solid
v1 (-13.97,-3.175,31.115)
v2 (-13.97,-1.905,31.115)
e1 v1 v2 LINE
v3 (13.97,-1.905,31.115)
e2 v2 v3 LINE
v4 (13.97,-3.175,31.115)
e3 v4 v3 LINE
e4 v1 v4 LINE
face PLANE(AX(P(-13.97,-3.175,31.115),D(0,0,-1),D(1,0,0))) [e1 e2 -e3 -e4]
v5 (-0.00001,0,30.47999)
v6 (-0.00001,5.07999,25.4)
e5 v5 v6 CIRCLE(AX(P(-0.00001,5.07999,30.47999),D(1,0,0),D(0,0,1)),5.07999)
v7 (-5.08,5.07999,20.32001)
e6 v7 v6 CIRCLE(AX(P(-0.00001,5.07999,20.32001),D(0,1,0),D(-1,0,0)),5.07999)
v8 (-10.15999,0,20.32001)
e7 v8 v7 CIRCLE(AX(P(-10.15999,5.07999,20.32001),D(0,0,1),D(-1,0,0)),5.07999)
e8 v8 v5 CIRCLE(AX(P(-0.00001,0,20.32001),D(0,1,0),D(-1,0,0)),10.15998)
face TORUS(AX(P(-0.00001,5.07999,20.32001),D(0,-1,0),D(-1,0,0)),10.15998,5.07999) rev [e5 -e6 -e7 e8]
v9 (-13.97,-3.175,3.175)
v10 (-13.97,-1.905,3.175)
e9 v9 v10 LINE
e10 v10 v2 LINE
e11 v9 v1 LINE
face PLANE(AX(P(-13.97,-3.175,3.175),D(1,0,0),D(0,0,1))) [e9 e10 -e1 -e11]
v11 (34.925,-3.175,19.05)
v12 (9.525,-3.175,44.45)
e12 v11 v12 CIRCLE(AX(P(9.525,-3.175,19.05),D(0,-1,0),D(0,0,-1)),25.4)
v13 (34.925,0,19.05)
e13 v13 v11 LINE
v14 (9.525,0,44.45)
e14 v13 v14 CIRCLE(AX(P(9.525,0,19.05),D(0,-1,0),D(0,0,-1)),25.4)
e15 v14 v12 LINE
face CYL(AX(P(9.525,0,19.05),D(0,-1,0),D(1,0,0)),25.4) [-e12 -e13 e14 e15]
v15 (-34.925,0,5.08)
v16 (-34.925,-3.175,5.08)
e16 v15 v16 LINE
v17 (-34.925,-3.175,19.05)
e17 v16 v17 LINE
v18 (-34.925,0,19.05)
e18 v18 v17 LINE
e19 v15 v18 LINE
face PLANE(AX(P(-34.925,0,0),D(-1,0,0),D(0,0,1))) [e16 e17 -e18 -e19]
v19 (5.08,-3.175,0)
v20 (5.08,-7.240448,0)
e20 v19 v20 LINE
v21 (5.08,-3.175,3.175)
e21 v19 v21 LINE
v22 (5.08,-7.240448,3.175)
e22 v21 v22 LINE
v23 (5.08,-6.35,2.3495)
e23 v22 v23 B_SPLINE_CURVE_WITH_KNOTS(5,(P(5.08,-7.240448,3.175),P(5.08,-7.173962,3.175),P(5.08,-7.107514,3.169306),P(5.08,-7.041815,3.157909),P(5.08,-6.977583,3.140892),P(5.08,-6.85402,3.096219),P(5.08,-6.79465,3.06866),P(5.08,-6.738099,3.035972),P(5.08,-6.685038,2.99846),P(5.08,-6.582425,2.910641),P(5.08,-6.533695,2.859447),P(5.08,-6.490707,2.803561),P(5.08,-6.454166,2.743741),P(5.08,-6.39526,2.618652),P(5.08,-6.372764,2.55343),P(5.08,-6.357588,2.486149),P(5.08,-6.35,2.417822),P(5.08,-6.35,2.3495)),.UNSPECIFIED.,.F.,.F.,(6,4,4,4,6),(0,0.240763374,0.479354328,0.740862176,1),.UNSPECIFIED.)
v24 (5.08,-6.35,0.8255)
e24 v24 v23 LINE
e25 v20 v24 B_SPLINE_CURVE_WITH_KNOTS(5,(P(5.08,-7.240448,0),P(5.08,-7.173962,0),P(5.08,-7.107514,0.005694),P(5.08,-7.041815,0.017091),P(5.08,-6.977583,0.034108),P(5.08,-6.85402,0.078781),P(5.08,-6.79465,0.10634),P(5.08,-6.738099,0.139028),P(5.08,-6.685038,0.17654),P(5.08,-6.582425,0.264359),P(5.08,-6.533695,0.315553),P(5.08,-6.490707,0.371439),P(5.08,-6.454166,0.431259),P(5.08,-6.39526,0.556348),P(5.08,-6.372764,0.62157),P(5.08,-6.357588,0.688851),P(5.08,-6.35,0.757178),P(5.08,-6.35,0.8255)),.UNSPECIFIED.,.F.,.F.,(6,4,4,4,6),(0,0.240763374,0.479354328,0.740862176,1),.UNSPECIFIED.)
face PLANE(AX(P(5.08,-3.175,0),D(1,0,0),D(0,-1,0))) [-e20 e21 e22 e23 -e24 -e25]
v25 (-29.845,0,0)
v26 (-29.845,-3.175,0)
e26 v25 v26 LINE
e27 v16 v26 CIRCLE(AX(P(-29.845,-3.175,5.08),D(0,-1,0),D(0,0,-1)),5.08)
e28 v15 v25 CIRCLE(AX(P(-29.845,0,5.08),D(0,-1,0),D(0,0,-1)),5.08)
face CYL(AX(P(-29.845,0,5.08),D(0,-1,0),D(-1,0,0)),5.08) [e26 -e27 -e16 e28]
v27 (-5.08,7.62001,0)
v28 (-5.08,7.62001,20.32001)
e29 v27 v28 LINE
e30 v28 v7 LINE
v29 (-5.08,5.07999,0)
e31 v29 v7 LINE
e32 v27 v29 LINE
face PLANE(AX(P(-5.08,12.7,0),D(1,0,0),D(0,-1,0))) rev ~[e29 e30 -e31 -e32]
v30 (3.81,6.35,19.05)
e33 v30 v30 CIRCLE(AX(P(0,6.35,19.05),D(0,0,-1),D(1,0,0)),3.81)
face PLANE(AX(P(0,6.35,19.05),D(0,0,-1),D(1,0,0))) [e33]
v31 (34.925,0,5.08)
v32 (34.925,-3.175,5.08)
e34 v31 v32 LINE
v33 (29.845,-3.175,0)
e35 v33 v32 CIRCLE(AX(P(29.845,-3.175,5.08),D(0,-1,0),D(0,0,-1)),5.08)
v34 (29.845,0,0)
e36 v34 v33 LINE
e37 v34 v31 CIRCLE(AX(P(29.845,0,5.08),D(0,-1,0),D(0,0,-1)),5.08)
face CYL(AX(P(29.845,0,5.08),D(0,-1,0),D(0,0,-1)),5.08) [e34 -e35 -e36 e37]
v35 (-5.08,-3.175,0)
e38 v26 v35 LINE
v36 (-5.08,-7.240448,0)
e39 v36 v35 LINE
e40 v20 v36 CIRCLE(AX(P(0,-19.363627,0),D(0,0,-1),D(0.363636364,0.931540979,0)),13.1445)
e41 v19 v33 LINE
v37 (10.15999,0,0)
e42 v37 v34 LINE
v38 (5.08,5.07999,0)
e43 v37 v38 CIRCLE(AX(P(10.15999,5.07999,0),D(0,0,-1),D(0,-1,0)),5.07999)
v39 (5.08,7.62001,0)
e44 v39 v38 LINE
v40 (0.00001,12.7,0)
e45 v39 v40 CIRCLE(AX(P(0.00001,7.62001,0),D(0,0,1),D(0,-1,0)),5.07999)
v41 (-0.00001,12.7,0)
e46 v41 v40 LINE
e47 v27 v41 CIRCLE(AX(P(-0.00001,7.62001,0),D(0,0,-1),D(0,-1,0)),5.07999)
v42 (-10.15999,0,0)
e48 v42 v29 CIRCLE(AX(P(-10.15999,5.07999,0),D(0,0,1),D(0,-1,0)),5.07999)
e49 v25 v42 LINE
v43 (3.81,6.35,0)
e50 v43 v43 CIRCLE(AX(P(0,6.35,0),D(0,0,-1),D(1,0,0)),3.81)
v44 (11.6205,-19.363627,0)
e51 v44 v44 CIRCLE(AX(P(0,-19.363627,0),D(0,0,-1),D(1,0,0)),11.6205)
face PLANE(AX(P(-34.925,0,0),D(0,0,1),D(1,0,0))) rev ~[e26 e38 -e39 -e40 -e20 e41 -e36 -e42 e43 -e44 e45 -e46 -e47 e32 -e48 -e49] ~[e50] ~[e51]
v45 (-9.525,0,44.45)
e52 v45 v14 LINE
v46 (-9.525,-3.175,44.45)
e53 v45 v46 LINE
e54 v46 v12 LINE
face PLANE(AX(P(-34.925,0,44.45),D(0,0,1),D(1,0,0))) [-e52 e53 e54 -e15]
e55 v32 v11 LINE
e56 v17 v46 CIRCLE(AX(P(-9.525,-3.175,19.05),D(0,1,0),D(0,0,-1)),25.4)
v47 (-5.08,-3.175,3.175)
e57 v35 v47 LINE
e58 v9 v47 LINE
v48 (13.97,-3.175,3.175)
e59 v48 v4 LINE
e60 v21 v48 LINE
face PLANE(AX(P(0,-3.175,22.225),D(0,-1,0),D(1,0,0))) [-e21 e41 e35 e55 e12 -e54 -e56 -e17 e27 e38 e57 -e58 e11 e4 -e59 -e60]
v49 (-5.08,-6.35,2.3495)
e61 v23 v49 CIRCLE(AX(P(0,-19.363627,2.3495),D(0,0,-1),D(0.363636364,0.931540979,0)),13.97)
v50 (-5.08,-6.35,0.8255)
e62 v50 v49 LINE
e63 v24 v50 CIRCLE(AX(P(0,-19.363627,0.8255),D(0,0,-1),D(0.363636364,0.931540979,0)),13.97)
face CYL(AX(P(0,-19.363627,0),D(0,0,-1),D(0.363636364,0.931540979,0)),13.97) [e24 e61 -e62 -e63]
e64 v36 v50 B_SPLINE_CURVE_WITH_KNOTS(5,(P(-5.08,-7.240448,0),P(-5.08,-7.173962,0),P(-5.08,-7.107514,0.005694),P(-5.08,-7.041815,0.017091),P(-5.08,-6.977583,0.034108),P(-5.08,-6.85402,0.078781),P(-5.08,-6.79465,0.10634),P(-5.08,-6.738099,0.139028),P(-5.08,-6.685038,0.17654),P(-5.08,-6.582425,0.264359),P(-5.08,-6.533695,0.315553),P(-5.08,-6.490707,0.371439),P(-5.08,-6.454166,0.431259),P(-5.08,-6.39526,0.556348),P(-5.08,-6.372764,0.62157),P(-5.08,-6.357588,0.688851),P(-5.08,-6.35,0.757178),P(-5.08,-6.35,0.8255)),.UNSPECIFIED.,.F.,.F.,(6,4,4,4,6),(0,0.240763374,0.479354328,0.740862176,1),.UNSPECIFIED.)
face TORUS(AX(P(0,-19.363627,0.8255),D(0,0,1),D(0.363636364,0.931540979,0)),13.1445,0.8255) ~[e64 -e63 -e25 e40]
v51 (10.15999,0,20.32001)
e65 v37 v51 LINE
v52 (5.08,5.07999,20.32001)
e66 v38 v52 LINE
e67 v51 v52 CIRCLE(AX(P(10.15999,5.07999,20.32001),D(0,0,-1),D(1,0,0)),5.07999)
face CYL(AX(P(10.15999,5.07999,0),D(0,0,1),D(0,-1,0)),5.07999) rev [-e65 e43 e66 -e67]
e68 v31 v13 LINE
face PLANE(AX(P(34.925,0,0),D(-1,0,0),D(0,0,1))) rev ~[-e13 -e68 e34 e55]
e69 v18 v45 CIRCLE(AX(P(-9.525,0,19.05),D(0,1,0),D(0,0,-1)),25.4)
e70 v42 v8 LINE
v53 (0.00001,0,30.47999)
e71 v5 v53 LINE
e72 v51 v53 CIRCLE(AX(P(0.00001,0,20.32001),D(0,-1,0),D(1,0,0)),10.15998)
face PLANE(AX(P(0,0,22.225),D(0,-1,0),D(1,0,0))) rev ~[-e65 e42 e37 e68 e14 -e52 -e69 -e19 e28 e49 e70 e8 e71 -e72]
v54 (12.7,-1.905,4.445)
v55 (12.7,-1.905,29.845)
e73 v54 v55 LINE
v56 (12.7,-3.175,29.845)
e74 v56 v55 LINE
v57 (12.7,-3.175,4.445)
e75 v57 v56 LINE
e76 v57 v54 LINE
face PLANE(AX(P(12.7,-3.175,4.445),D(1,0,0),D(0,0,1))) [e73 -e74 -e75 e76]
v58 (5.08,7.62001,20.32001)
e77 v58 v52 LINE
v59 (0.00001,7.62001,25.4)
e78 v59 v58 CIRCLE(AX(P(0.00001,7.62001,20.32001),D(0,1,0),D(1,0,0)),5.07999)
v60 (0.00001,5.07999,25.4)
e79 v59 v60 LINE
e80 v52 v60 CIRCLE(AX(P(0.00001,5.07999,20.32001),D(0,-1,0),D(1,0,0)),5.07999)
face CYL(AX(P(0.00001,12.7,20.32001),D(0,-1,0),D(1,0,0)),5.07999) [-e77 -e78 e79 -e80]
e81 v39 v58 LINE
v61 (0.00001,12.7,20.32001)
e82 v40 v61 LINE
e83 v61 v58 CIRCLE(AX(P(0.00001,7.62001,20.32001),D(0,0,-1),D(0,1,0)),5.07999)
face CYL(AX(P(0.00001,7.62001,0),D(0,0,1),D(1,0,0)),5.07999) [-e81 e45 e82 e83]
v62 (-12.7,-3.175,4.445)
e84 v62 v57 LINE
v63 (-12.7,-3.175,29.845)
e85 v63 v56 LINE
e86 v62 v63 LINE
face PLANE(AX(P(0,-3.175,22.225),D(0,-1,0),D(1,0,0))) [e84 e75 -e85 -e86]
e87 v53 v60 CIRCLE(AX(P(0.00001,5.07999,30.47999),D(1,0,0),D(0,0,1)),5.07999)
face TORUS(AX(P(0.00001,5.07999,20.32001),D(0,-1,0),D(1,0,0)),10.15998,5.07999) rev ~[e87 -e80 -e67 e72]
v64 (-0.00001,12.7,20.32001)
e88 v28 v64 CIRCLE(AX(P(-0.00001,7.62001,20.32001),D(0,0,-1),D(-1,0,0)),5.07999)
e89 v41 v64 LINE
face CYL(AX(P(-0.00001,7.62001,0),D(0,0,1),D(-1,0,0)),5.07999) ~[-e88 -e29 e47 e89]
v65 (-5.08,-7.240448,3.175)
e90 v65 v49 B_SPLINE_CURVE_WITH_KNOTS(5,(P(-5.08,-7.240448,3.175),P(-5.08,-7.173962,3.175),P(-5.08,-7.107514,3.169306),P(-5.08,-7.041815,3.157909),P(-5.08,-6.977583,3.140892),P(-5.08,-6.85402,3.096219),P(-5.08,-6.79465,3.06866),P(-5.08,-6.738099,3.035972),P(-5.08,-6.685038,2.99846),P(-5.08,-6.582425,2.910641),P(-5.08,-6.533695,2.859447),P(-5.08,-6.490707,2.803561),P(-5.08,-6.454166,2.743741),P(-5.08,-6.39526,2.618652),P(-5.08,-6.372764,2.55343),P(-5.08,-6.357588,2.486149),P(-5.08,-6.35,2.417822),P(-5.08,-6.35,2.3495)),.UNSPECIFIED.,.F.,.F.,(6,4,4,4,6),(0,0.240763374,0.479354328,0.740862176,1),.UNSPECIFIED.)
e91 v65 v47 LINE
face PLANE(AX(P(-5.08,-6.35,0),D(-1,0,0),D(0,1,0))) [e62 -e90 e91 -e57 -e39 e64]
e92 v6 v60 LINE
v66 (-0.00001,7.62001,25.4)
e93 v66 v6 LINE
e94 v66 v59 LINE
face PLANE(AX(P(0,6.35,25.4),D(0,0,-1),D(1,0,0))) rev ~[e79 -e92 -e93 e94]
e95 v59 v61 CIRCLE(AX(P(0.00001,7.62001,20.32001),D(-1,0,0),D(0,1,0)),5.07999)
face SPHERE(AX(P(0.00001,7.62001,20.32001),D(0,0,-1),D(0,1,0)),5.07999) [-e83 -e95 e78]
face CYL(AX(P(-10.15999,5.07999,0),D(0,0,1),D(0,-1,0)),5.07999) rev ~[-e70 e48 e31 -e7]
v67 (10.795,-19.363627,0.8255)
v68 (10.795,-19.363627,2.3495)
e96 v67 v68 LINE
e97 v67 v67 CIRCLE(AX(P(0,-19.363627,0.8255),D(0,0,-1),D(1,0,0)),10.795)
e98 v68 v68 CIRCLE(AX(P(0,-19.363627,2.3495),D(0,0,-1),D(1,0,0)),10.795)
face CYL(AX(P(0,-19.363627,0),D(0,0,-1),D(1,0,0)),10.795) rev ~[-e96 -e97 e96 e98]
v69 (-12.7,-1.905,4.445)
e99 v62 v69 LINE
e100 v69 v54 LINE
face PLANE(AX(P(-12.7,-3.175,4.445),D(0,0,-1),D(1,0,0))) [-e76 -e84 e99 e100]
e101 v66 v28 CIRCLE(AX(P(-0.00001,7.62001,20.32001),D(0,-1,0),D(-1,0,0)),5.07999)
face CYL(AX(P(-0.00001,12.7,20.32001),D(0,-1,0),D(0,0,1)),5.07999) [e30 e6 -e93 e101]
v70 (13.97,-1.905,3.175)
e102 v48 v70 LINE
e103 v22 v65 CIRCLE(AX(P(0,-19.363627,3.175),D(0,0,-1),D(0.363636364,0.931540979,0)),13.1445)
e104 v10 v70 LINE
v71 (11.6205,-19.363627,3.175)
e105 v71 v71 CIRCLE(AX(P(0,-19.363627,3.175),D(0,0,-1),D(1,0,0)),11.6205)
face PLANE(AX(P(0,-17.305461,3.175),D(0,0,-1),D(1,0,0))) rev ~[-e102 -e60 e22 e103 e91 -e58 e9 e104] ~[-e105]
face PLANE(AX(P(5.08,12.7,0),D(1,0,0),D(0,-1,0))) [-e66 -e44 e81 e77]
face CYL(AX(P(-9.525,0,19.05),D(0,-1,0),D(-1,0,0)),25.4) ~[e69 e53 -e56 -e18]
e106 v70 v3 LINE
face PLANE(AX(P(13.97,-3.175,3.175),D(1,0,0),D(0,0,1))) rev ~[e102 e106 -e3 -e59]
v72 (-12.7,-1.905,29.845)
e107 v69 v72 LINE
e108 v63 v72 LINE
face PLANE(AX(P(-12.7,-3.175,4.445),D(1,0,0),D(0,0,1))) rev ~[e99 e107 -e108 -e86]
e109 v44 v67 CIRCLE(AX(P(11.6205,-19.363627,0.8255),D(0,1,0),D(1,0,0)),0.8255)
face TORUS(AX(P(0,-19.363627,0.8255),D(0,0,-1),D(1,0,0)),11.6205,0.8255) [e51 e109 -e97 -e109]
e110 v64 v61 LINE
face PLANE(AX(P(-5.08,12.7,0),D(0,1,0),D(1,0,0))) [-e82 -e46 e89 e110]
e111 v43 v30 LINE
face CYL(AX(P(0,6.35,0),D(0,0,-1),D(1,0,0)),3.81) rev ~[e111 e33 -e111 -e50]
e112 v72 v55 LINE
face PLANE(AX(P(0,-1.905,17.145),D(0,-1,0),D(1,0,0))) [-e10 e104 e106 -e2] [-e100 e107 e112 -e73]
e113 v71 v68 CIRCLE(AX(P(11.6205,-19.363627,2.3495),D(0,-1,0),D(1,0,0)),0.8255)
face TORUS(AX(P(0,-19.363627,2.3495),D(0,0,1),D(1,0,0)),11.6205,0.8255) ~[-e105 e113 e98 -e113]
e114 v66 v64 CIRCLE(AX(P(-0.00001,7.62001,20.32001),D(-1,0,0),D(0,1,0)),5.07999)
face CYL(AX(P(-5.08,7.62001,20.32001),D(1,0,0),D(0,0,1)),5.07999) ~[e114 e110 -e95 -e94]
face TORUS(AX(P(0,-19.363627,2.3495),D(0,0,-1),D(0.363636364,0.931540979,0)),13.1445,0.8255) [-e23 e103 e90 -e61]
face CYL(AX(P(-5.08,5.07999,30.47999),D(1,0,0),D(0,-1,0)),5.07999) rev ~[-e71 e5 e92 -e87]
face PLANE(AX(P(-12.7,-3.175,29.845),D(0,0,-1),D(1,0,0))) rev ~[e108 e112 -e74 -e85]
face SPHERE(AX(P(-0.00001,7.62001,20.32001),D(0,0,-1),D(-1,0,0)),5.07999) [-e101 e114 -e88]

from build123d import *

# Parameters (mm, degrees)
F0_W      = 69.85
F0_H      = 44.45
F1_DEPTH  = 3.175
F2_R      = 25.4
F3_R      = 5.08
F4_W      = 10.16
F4_H      = 12.7
F5_DEPTH  = 25.4
F6_R      = 3.81
F7_DEPTH  = 19.05
F8_R      = 5.07999
F9_R      = 10.795
F10_DEPTH = 3.175
F11_R     = 0.8255
F12_W     = 27.94
F12_H     = 27.94
F12_W_2   = 25.4
F12_H_2   = 25.4
F13_DEPTH = 1.27


# Not quite as in the source:
# - a fillet or chamfer is up to 0.001 mm smaller than in the source, because OpenCascade refuses the exact size


with BuildPart() as f1:
    # F0 (on Front) → F1 (new body)
    with BuildSketch(Plane.XZ):
        with Locations((0, 22.225)):
            Rectangle(F0_W, F0_H)
    extrude(amount=F1_DEPTH)

    # F2
    f2_edges = [f1.edges().sort_by_distance(p)[0] for p in [
        (-34.925, -1.5875, 44.45),
        (34.925, -1.5875, 44.45),
    ]]
    fillet(f2_edges, radius=F2_R)

    # F3
    f3_edges = [f1.edges().sort_by_distance(p)[0] for p in [
        (-34.925, -1.5875, 0),
        (34.925, -1.5875, 0),
    ]]
    fillet(f3_edges, radius=F3_R)

    # F4 (on face) → F5 (join)
    with BuildSketch(Plane(origin=(0, 0, 0), x_dir=(1, 0, 0), z_dir=(0, 0, -1))):
        with Locations((0, -6.35)):
            Rectangle(F4_W, F4_H)
    extrude(amount=-F5_DEPTH)

    # F6 (on face) → F7 (cut)
    with BuildSketch(Plane(origin=(0, 0, 0), x_dir=(1, 0, 0), z_dir=(0, 0, -1))):
        with Locations((0, -6.35)):
            Circle(F6_R)
    extrude(amount=-F7_DEPTH, mode=Mode.SUBTRACT)

    # F8 (radius 5.08 in the source; OpenCascade refuses exactly that, so slightly less here)
    f8_edges = [f1.edges().sort_by_distance(p)[0] for p in [
        (-5.08, 12.7, 12.7),
        (5.08, 12.7, 12.7),
        (0, 0, 25.4),
        (-5.08, 6.35, 25.4),
        (0, 12.7, 25.4),
        (5.08, 6.35, 25.4),
        (5.08, 0, 12.7),
        (-5.08, 0, 12.7),
    ]]
    fillet(f8_edges, radius=F8_R)

    # F9 (on face) → F10 (join)
    with BuildSketch(Plane(origin=(0, 0, 0), x_dir=(1, 0, 0), z_dir=(0, 0, -1))):
        with BuildLine():
            Line((-5.08, 6.35), (-5.08, 3.175))
            Line((-5.08, 3.175), (5.08, 3.175))
            Line((5.08, 3.175), (5.08, 6.35))
            ThreePointArc((5.08, 6.35), (0, 33.3336274728), (-5.08, 6.35))
        make_face()
        with Locations((0, 19.3636274728)):
            Circle(F9_R, mode=Mode.SUBTRACT)
    extrude(amount=-F10_DEPTH)

    # F11
    f11_edges = [f1.edges().sort_by_distance(p)[0] for p in [
        (-10.795, -19.363627, 3.175),
        (0, -33.333627, 3.175),
        (0, -33.333627, 0),
        (-10.795, -19.363627, 0),
    ]]
    fillet(f11_edges, radius=F11_R)

    # F12 (on face) → F13 (cut)
    with BuildSketch(Plane.XZ.offset(3.175)):
        with Locations((0, 17.145)):
            Rectangle(F12_W, F12_H)
        with Locations((0, 17.145)):
            Rectangle(F12_W_2, F12_H_2, mode=Mode.SUBTRACT)
    extrude(amount=-F13_DEPTH, mode=Mode.SUBTRACT)


solid = f1.part
